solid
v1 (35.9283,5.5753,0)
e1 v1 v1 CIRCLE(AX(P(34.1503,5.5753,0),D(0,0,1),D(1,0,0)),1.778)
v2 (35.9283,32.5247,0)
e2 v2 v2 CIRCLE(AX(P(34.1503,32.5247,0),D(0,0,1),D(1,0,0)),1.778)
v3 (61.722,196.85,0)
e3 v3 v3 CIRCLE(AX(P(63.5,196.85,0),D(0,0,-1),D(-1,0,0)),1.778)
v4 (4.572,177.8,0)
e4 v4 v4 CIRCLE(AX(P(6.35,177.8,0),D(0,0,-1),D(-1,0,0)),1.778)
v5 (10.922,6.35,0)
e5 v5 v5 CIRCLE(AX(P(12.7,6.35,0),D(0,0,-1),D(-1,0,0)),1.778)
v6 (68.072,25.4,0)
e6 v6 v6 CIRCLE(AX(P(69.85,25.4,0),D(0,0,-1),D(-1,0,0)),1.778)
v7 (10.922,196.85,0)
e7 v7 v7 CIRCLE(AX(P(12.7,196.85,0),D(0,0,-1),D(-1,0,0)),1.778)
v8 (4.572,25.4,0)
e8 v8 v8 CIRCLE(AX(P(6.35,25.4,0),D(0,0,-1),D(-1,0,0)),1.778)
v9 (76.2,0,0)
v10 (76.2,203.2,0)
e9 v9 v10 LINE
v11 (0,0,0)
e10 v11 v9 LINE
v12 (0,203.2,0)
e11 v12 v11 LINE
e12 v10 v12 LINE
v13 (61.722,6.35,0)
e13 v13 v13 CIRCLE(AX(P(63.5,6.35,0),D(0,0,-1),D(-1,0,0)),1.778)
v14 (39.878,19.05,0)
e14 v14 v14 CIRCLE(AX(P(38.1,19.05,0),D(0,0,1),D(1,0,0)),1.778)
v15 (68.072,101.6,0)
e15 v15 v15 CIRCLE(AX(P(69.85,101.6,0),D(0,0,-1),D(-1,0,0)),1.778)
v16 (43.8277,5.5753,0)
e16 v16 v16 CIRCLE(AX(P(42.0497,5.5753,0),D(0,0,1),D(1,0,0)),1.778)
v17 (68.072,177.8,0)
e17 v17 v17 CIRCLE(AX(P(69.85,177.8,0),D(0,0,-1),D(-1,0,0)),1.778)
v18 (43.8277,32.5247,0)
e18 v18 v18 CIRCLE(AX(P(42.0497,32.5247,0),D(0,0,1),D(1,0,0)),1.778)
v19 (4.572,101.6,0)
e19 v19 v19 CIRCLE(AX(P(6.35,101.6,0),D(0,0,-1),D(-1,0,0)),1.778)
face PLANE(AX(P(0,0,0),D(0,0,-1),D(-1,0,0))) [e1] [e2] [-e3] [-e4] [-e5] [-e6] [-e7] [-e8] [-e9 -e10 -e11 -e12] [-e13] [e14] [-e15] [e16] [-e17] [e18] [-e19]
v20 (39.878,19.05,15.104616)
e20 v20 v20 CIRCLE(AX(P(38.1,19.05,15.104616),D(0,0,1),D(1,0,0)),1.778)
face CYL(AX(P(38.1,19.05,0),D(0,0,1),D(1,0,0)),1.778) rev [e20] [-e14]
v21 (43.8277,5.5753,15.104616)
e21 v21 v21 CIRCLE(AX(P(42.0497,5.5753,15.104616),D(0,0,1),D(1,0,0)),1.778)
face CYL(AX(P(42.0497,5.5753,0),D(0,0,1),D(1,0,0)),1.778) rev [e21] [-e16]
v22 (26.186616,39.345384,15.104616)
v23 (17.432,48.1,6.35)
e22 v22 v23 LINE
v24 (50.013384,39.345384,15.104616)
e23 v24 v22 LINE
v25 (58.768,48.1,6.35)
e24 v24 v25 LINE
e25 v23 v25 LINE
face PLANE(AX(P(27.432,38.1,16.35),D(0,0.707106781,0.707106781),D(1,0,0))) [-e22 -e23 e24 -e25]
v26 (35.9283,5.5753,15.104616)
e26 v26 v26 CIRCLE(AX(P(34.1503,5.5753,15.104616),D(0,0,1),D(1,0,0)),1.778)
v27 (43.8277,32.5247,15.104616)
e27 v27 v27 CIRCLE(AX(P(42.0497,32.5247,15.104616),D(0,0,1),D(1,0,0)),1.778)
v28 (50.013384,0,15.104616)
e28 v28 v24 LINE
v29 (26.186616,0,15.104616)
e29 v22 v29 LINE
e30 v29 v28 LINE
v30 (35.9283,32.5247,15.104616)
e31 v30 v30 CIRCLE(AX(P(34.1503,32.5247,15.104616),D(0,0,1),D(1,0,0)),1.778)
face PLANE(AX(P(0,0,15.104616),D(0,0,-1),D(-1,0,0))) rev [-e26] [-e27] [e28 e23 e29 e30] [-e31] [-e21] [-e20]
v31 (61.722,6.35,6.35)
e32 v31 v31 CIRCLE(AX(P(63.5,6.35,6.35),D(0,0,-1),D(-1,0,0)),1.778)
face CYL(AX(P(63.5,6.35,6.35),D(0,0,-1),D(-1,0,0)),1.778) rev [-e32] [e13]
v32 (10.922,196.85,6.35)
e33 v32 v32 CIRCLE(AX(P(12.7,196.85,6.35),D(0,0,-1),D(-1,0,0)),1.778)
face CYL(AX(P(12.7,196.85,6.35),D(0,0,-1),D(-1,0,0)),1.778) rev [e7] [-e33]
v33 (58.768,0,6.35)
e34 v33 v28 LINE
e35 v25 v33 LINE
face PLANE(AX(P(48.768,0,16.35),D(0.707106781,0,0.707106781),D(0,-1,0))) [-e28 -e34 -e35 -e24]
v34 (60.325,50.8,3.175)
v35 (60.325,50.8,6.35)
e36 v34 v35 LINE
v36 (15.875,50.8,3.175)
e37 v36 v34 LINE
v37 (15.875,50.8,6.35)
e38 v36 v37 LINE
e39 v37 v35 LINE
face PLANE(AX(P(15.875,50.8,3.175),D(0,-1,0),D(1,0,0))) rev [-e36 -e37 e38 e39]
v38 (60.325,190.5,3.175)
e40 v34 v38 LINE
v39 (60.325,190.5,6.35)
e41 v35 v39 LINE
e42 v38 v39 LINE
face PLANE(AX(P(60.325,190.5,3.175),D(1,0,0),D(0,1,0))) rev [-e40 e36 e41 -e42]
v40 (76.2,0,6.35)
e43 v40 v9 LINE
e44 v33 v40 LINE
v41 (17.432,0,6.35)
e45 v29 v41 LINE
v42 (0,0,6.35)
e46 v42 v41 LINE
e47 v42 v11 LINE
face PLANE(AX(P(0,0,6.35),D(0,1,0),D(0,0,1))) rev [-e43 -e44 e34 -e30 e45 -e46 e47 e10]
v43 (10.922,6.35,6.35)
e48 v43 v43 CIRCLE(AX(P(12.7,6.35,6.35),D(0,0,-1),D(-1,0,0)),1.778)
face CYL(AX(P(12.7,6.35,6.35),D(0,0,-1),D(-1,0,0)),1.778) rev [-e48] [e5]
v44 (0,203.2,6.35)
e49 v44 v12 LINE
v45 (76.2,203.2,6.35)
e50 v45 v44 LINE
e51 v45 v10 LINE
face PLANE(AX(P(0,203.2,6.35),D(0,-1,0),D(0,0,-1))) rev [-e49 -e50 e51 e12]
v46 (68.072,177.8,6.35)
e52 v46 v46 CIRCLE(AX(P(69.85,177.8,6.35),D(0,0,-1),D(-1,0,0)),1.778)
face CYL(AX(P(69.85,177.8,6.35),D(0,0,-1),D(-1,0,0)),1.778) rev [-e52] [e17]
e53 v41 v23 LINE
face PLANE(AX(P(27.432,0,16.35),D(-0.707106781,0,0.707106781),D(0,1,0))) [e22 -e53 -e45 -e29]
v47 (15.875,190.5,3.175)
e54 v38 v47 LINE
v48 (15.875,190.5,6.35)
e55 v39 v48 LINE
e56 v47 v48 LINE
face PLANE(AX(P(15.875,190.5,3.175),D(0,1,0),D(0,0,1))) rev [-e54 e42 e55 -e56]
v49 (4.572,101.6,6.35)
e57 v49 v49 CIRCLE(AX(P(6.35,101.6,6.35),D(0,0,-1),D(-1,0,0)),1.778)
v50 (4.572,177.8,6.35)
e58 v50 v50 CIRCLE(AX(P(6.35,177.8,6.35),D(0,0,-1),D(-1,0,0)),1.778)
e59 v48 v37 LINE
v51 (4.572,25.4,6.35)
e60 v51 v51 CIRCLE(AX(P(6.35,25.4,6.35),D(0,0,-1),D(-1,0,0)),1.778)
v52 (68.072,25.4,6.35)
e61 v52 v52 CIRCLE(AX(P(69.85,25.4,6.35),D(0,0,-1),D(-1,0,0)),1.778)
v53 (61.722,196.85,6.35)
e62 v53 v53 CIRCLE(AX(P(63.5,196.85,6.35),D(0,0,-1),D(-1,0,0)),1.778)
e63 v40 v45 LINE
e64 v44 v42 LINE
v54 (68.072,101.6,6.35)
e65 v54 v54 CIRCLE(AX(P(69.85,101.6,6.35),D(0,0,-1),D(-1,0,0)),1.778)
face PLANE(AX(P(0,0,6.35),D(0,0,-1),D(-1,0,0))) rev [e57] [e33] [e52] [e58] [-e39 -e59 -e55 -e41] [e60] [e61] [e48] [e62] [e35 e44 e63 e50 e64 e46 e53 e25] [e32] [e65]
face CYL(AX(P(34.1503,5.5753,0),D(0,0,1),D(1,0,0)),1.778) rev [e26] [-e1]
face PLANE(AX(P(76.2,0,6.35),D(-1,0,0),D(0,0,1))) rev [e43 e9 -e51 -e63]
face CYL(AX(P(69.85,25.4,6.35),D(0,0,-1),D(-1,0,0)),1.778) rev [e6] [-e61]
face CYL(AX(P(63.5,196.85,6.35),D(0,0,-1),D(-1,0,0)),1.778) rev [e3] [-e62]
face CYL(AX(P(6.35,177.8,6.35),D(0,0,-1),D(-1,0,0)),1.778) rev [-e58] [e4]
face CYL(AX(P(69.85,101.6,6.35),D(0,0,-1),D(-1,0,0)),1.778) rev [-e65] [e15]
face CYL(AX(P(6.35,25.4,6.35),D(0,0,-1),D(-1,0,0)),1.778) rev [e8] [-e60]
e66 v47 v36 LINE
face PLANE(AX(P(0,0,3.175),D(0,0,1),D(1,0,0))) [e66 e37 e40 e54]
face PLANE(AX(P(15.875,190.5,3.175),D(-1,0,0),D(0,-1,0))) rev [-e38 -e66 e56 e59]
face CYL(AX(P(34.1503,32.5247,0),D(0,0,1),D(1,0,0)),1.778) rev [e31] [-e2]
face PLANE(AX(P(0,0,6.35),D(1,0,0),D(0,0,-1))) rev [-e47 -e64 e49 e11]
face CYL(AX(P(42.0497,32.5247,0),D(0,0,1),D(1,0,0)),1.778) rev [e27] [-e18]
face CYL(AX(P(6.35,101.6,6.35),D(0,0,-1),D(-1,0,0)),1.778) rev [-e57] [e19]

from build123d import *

# Parameters (mm, degrees)
SKETCH1_W           = 76.2
SKETCH1_H           = 203.2
BOSS_EXTRUDE1_DEPTH = 6.35
SKETCH6_R           = 1.778
CUT_EXTRUDE4_DEPTH  = 6.35
SKETCH7_W           = 21.336
SKETCH7_H           = 38.1
BOSS_EXTRUDE2_DEPTH = 8.754615714
SKETCH8_R           = 1.778
CUT_EXTRUDE5_DEPTH  = 218.542707108
SKETCH9_W           = 44.45
SKETCH9_H           = 139.7
CUT_EXTRUDE6_DEPTH  = 3.175
CHAMFER1_SIZE       = 10


with BuildPart() as part:
    # Sketch1 → Boss-Extrude1 (new body)
    with BuildSketch(Plane.XY):
        with Locations((38.1, 101.6)):
            Rectangle(SKETCH1_W, SKETCH1_H)
    extrude(amount=BOSS_EXTRUDE1_DEPTH)

    # Sketch6 → Cut-Extrude4 (cut)
    with BuildSketch(Plane(origin=(0, 0, 0), x_dir=(-1, 0, 0), z_dir=(0, 0, -1))):
        with Locations((-63.5, 6.35)):
            Circle(SKETCH6_R)
        with Locations((-12.7, 6.35)):
            Circle(SKETCH6_R)
        with Locations((-6.35, 177.8)):
            Circle(SKETCH6_R)
        with Locations((-6.35, 25.4)):
            Circle(SKETCH6_R)
        with Locations((-69.85, 25.4)):
            Circle(SKETCH6_R)
        with Locations((-69.85, 177.8)):
            Circle(SKETCH6_R)
        with Locations((-63.5, 196.85)):
            Circle(SKETCH6_R)
        with Locations((-12.7, 196.85)):
            Circle(SKETCH6_R)
        with Locations((-6.35, 101.6)):
            Circle(SKETCH6_R)
        with Locations((-69.85, 101.6)):
            Circle(SKETCH6_R)
    extrude(amount=-CUT_EXTRUDE4_DEPTH, mode=Mode.SUBTRACT)

    # Sketch7 → Boss-Extrude2 (add)
    with BuildSketch(Plane.XY.offset(6.35)):
        with Locations((38.1, 19.05)):
            Rectangle(SKETCH7_W, SKETCH7_H)
    extrude(amount=BOSS_EXTRUDE2_DEPTH)

    # Sketch8 → Cut-Extrude5 (cut, through all)
    with BuildSketch(Plane.XY.offset(15.104615714)):
        with Locations((34.1503, 5.5753)):
            Circle(SKETCH8_R)
        with Locations((42.0497, 5.5753)):
            Circle(SKETCH8_R)
        with Locations((42.0497, 32.5247)):
            Circle(SKETCH8_R)
        with Locations((34.1503, 32.5247)):
            Circle(SKETCH8_R)
        with Locations((38.1, 19.05)):
            Circle(SKETCH8_R)
    extrude(amount=-CUT_EXTRUDE5_DEPTH, mode=Mode.SUBTRACT)

    # Sketch9 → Cut-Extrude6 (cut)
    with BuildSketch(Plane.XY.offset(6.35)):
        with Locations((38.1, 120.65)):
            Rectangle(SKETCH9_W, SKETCH9_H)
    extrude(amount=-CUT_EXTRUDE6_DEPTH, mode=Mode.SUBTRACT)

    # Chamfer1
    # the kernel refuses this chamfer: 10 mm, written as the material it adds along each edge
    with BuildSketch(Plane(origin=(27.432, 38.1, 6.35), x_dir=(-0.9996219169112968, 0, -0.027495876610586403), z_dir=(0, -1, 0))) as chamfer1_piece_1_section:
        Polygon((CHAMFER1_SIZE * 0.999621916911, -CHAMFER1_SIZE * 0.0274958766106), (-CHAMFER1_SIZE * 0.0274958766106, -CHAMFER1_SIZE * 0.999621916911), (0, 0), align=None)
    chamfer1_piece_1 = extrude(amount=38.1, mode=Mode.PRIVATE)
    chamfer1_piece_1 = split(chamfer1_piece_1, bisect_by=Plane(origin=(24.052510744, 19.05, 15.104615714), z_dir=(0, 0, -1)), keep=Keep.TOP, mode=Mode.PRIVATE)
    add(chamfer1_piece_1)
    with BuildSketch(Plane(origin=(48.768, 38.1, 6.35), x_dir=(0, 0.9996219169112968, -0.027495876610586403), z_dir=(-1, 0, 0))) as chamfer1_piece_2_section:
        Polygon((CHAMFER1_SIZE * 0.999621916911, -CHAMFER1_SIZE * 0.0274958766106), (-CHAMFER1_SIZE * 0.0274958766106, -CHAMFER1_SIZE * 0.999621916911), (0, 0), align=None)
    chamfer1_piece_2 = extrude(amount=21.336, mode=Mode.PRIVATE)
    chamfer1_piece_2 = split(chamfer1_piece_2, bisect_by=Plane(origin=(38.1, 41.479489256, 15.104615714), z_dir=(0, 0, -1)), keep=Keep.TOP, mode=Mode.PRIVATE)
    add(chamfer1_piece_2)
    with BuildSketch(Plane(origin=(48.768, 0, 6.35), x_dir=(0.9996219169112968, 0, -0.027495876610586403), z_dir=(0, 1, 0))) as chamfer1_piece_3_section:
        Polygon((CHAMFER1_SIZE * 0.999621916911, -CHAMFER1_SIZE * 0.0274958766106), (-CHAMFER1_SIZE * 0.0274958766106, -CHAMFER1_SIZE * 0.999621916911), (0, 0), align=None)
    chamfer1_piece_3 = extrude(amount=38.1, mode=Mode.PRIVATE)
    chamfer1_piece_3 = split(chamfer1_piece_3, bisect_by=Plane(origin=(52.147489256, 19.05, 15.104615714), z_dir=(0, 0, -1)), keep=Keep.TOP, mode=Mode.PRIVATE)
    add(chamfer1_piece_3)
    with BuildSketch(Plane(origin=(27.432, 63.81682988, 6.35), x_dir=(-0.9996219169112968, 0, -0.027495876610586403), z_dir=(0, -1, 0))) as chamfer1_piece_4a_section:
        Polygon((CHAMFER1_SIZE * 0.999621916911, -CHAMFER1_SIZE * 0.0274958766106), (-CHAMFER1_SIZE * 0.0274958766106, -CHAMFER1_SIZE * 0.999621916911), (0, 0), align=None)
    chamfer1_piece_4a = extrude(amount=63.81682988, mode=Mode.PRIVATE)
    chamfer1_piece_4a = split(chamfer1_piece_4a, bisect_by=Plane(origin=(24.052510744, 50.8, 9.492641484), z_dir=(0, -1, 0)), keep=Keep.TOP, mode=Mode.PRIVATE)
    chamfer1_piece_4a = split(chamfer1_piece_4a, bisect_by=Plane(origin=(24.052510744, 38.1, 9.492641484), z_dir=(0, 1, 0)), keep=Keep.TOP, mode=Mode.PRIVATE)
    chamfer1_piece_4a = split(chamfer1_piece_4a, bisect_by=Plane(origin=(24.052510744, 44.45, 15.104615714), z_dir=(0, 0, -1)), keep=Keep.TOP, mode=Mode.PRIVATE)
    with BuildSketch(Plane(origin=(48.768, 38.1, 6.35), x_dir=(0, 0.9996219169112968, -0.027495876610586403), z_dir=(-1, 0, 0))) as chamfer1_piece_4b_section:
        Polygon((CHAMFER1_SIZE * 0.999621916911, -CHAMFER1_SIZE * 0.0274958766106), (-CHAMFER1_SIZE * 0.0274958766106, -CHAMFER1_SIZE * 0.999621916911), (0, 0), align=None)
    chamfer1_piece_4b = extrude(amount=47.05282988, mode=Mode.PRIVATE)
    chamfer1_piece_4b = split(chamfer1_piece_4b, bisect_by=Plane(origin=(27.432, 41.479489256, 9.492641484), z_dir=(-1, 0, 0)), keep=Keep.TOP, mode=Mode.PRIVATE)
    chamfer1_piece_4b = split(chamfer1_piece_4b, bisect_by=Plane(origin=(14.57358506, 41.479489256, 15.104615714), z_dir=(0, 0, -1)), keep=Keep.TOP, mode=Mode.PRIVATE)
    chamfer1_piece_4 = chamfer1_piece_4a & chamfer1_piece_4b
    add(chamfer1_piece_4)
    with BuildSketch(Plane(origin=(74.48482988, 38.1, 6.35), x_dir=(0, 0.9996219169112968, -0.027495876610586403), z_dir=(-1, 0, 0))) as chamfer1_piece_5a_section:
        Polygon((CHAMFER1_SIZE * 0.999621916911, -CHAMFER1_SIZE * 0.0274958766106), (-CHAMFER1_SIZE * 0.0274958766106, -CHAMFER1_SIZE * 0.999621916911), (0, 0), align=None)
    chamfer1_piece_5a = extrude(amount=47.05282988, mode=Mode.PRIVATE)
    chamfer1_piece_5a = split(chamfer1_piece_5a, bisect_by=Plane(origin=(61.62641494, 41.479489256, 15.104615714), z_dir=(0, 0, -1)), keep=Keep.TOP, mode=Mode.PRIVATE)
    chamfer1_piece_5a = split(chamfer1_piece_5a, bisect_by=Plane(origin=(48.768, 41.479489256, 9.492641484), z_dir=(1, 0, 0)), keep=Keep.TOP, mode=Mode.PRIVATE)
    with BuildSketch(Plane(origin=(48.768, 0, 6.35), x_dir=(0.9996219169112968, 0, -0.027495876610586403), z_dir=(0, 1, 0))) as chamfer1_piece_5b_section:
        Polygon((CHAMFER1_SIZE * 0.999621916911, -CHAMFER1_SIZE * 0.0274958766106), (-CHAMFER1_SIZE * 0.0274958766106, -CHAMFER1_SIZE * 0.999621916911), (0, 0), align=None)
    chamfer1_piece_5b = extrude(amount=63.81682988, mode=Mode.PRIVATE)
    chamfer1_piece_5b = split(chamfer1_piece_5b, bisect_by=Plane(origin=(52.147489256, 50.8, 9.492641484), z_dir=(0, -1, 0)), keep=Keep.TOP, mode=Mode.PRIVATE)
    chamfer1_piece_5b = split(chamfer1_piece_5b, bisect_by=Plane(origin=(52.147489256, 44.45, 15.104615714), z_dir=(0, 0, -1)), keep=Keep.TOP, mode=Mode.PRIVATE)
    chamfer1_piece_5b = split(chamfer1_piece_5b, bisect_by=Plane(origin=(52.147489256, 38.1, 9.492641484), z_dir=(0, 1, 0)), keep=Keep.TOP, mode=Mode.PRIVATE)
    chamfer1_piece_5 = chamfer1_piece_5a & chamfer1_piece_5b
    add(chamfer1_piece_5)


solid = part.part
